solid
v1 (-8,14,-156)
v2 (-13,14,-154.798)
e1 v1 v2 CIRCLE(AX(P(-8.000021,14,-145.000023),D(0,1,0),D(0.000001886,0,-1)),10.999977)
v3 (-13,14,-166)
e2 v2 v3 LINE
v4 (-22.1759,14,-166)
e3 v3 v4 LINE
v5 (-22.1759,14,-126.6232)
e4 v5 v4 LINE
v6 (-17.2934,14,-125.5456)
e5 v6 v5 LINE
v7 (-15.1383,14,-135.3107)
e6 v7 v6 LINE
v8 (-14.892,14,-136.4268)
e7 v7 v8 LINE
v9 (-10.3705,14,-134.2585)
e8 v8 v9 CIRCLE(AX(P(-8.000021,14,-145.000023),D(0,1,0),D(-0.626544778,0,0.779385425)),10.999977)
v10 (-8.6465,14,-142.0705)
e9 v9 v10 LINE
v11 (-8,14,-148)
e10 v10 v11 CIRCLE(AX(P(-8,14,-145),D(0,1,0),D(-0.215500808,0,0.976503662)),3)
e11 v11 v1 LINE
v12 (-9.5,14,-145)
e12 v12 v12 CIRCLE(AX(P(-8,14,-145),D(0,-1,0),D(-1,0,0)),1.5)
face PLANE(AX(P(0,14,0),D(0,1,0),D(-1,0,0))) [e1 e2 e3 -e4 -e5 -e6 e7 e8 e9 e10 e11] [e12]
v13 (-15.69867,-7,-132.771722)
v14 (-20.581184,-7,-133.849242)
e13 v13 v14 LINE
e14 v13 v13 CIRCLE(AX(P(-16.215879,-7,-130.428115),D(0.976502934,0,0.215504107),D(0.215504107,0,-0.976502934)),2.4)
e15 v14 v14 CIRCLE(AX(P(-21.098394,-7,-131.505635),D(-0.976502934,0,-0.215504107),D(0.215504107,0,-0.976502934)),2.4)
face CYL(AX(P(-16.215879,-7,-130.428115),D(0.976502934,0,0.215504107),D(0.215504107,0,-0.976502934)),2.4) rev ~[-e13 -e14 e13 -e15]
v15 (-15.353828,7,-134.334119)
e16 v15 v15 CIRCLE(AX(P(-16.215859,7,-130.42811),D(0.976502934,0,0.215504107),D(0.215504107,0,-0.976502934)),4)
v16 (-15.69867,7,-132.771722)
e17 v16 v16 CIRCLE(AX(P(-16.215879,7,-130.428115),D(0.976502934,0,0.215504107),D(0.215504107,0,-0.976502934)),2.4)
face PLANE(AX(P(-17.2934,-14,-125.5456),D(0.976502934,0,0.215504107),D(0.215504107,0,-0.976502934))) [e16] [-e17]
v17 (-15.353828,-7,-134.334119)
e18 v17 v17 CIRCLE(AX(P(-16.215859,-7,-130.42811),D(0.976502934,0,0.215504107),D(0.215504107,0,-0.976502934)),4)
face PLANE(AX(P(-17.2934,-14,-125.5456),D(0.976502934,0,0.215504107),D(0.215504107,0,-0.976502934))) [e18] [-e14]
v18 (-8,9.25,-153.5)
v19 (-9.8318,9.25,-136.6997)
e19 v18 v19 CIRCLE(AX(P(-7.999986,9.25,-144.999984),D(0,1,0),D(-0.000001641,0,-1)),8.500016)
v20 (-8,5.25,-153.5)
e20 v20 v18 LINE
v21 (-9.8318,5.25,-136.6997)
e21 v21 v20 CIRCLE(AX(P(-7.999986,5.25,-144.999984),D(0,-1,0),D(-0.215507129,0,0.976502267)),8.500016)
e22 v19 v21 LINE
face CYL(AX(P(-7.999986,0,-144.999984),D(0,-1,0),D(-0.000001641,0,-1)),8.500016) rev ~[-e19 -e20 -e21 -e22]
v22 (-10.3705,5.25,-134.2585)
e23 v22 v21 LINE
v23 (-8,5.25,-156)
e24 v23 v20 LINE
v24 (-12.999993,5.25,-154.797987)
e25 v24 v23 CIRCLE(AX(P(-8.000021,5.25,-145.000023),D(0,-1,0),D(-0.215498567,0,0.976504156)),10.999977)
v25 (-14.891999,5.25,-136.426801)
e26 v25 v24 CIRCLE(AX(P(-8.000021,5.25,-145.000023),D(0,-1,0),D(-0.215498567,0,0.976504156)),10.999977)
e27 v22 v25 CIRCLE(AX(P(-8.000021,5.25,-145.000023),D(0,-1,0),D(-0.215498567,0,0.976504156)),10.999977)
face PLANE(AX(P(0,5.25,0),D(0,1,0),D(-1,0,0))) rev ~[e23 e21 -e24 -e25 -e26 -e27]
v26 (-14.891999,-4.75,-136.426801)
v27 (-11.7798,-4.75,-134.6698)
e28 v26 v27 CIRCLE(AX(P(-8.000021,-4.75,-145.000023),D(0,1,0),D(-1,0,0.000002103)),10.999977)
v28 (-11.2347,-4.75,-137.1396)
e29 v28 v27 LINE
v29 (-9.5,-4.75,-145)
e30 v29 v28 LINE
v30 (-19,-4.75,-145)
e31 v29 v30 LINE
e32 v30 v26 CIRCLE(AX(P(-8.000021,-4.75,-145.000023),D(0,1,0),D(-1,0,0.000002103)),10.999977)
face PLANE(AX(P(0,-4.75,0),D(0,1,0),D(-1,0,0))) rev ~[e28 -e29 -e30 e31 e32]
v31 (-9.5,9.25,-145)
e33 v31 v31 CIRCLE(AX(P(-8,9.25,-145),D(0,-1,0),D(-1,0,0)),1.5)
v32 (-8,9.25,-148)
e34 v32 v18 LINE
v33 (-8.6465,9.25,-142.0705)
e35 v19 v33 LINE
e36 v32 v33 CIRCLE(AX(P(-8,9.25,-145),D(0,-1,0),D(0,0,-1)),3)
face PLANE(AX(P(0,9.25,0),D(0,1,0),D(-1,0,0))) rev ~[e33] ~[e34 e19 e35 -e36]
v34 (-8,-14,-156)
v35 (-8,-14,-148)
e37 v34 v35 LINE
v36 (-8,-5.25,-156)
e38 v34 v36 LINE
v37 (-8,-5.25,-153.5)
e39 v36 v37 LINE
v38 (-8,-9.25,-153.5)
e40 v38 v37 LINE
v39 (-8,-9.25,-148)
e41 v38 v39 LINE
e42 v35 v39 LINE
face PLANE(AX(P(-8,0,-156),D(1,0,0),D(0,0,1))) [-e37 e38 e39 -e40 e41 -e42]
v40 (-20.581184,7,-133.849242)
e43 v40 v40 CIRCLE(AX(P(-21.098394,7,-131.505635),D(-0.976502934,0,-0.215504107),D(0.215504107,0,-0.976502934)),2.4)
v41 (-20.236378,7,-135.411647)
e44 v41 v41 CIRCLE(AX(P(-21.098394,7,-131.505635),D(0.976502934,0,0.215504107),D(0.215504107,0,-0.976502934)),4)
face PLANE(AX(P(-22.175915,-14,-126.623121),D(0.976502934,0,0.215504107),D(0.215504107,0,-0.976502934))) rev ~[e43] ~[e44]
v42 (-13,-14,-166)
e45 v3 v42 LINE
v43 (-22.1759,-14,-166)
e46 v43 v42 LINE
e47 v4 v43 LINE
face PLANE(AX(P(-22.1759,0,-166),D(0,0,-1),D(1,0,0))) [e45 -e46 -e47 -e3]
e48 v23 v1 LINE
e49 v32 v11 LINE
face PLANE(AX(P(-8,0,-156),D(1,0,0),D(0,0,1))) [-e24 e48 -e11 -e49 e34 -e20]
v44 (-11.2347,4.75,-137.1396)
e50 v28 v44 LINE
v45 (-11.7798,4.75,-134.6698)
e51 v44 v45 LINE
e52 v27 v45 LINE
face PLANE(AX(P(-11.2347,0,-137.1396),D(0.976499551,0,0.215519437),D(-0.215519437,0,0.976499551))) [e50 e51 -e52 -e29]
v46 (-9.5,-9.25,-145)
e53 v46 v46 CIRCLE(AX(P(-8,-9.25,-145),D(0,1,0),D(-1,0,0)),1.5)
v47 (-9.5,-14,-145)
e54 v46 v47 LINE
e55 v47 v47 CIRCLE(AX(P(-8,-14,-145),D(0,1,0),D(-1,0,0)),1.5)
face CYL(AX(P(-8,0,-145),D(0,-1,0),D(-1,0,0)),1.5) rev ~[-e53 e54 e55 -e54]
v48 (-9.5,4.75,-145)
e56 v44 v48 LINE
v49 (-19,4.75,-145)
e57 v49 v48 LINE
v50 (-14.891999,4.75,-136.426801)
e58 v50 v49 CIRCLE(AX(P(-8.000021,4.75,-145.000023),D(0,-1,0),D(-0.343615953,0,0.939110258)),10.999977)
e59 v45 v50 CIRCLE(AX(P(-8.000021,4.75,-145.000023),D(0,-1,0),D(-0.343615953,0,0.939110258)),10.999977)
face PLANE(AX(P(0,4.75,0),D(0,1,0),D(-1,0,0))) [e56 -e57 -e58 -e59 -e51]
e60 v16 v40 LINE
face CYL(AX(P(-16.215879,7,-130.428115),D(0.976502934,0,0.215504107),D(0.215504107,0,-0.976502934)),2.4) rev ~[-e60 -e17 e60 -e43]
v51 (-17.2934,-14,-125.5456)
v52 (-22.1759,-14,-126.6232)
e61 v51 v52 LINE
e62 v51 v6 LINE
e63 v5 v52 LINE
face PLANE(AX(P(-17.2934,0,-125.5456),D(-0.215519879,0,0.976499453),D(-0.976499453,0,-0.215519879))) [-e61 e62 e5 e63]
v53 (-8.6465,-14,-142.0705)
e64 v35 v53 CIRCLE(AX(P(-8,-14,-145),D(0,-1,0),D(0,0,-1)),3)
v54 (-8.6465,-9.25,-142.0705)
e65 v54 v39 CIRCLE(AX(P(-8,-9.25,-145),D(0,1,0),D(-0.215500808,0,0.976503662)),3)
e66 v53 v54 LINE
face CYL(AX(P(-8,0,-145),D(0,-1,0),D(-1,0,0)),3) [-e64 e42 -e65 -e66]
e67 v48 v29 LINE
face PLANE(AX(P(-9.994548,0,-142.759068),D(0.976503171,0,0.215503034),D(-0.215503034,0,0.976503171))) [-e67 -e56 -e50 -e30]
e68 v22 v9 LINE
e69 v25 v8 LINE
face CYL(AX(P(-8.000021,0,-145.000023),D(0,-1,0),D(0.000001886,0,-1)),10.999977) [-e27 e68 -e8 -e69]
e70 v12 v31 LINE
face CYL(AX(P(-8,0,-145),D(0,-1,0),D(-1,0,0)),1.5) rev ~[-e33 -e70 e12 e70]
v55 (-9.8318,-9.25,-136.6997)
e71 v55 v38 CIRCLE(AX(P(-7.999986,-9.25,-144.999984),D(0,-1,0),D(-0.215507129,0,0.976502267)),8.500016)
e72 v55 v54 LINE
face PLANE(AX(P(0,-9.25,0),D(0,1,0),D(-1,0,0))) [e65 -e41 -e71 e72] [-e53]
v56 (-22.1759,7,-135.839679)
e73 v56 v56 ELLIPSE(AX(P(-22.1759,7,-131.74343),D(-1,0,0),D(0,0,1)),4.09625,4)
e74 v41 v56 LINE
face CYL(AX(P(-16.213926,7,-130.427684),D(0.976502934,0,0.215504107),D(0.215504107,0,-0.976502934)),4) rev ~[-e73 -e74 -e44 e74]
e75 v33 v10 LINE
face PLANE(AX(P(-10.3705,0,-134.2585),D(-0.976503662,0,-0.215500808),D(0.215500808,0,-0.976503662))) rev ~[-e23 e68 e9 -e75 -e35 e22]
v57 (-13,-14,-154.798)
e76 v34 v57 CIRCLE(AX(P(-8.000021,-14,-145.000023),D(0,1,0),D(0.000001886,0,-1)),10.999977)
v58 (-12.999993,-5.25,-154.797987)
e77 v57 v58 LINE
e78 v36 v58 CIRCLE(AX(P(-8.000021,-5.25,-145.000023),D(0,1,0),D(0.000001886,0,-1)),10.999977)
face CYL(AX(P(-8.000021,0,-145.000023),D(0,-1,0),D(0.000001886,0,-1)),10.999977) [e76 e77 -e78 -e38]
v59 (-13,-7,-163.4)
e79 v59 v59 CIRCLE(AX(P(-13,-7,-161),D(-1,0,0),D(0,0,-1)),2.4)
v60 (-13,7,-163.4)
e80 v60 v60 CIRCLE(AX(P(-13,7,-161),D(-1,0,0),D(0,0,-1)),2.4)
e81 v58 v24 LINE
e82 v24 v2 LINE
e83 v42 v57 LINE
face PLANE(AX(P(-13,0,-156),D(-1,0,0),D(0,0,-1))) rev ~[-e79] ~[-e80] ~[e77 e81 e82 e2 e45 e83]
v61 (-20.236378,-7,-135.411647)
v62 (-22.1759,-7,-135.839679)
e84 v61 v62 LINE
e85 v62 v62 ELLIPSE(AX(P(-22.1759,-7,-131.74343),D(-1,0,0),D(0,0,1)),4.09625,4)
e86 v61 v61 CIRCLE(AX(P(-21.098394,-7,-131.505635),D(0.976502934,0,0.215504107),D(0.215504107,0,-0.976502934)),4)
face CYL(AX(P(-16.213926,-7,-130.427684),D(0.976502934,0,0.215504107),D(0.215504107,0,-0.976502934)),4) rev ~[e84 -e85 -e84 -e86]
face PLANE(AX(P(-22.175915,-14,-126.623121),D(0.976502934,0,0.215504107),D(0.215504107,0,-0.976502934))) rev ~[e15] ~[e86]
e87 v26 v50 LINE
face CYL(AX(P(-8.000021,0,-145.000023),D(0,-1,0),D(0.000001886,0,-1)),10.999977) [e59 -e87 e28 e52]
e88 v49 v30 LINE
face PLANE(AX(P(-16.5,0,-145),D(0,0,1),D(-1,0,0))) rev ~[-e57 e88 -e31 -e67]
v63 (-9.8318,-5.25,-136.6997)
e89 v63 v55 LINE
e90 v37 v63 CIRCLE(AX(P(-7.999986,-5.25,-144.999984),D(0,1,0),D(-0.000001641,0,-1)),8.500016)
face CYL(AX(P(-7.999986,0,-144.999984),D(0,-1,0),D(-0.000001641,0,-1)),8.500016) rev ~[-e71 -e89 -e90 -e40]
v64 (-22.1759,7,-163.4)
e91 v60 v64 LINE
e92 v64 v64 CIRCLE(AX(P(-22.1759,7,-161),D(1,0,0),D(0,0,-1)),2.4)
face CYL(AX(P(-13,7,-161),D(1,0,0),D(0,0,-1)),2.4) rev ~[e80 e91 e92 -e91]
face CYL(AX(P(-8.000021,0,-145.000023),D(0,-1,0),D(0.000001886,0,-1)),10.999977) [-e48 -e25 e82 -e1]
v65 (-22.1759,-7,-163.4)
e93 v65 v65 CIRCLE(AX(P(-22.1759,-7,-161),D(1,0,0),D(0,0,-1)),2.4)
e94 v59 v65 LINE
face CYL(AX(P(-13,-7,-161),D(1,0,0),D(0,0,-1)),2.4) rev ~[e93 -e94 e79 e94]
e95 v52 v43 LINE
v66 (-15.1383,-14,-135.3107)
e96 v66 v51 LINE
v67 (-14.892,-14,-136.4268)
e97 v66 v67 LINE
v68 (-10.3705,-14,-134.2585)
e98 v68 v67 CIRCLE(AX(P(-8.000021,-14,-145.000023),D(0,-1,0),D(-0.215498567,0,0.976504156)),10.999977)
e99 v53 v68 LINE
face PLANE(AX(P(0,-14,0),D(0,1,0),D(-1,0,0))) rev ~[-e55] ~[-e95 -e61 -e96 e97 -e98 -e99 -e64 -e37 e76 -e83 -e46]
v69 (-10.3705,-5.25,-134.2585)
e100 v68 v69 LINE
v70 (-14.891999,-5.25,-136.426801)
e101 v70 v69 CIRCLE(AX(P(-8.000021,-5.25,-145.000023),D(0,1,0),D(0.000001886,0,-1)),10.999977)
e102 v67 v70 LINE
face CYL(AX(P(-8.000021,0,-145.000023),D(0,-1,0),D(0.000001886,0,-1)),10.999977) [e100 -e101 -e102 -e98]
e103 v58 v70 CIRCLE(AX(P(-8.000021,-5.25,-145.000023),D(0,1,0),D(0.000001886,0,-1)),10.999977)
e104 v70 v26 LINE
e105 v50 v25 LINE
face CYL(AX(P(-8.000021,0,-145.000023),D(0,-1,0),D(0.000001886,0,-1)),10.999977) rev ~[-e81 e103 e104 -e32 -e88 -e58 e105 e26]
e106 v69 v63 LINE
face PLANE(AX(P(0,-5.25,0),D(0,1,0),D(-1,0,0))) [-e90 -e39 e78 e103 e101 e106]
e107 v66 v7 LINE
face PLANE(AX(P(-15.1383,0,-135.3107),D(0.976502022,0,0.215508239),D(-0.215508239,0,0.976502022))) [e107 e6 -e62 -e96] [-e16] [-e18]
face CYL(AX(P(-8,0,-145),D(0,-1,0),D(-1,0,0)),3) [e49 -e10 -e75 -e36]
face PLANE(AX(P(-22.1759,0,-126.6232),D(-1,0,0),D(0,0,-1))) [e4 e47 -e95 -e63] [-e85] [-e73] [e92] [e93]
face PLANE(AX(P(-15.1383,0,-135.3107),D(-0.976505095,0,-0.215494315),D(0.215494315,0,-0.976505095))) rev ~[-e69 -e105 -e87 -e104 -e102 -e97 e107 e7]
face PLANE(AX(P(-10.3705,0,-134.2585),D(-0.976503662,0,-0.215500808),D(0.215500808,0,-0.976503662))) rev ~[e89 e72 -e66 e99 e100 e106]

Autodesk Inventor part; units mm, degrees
ref_plane "YZ Plane" through (0, 0, 0) normal (1, 0, 0) x (0, 1, 0)
ref_plane "XZ Plane" through (0, 0, 0) normal (0, 1, 0) x (-1, 0, 0)
ref_plane "XY Plane" through (0, 0, 0) normal (0, 0, 1) x (1, 0, 0)
sketch "Sketch1" plane through (0, 0, 0) normal (0, 1, 0) x (-1, 0, 0)
  line L0 (0, 0) -> (0, -145)
  line L1 (0, -145) -> (3, -145)
  line L2 (3, -145) -> (8, -145)
  circle A0 centre (8, -145) radius 1.5
  line L3 (0, 0) -> (40, 0)
  line L4 (0, -145) -> (0, -250)
  line L5 (0, -250) -> (8, -250)
  line L6 (8, -156) -> (8, -148)
  circle A1 centre (8, -145) radius 3
  line L7 (13, -250) -> (8, -250)
  line L8 (8, -156) -> (13, -156)
  line L9 (13, -156) -> (13, -166)
  line L10 (10.3705, -134.2585) -> (15.1383, -135.3107)
  line L11 (15.1383, -135.3107) -> (14.892, -136.4268)
  line L12 (15.1383, -135.3107) -> (17.2934, -125.5456)
  line L13 (17.2934, -125.5456) -> (12.5256, -124.4934)
  line L14 (17.2934, -125.5456) -> (22.1759, -126.6232)
  line L15 (13, -166) -> (18, -166)
  line L16 (22.1759, -126.6232) -> (22.1759, -166)
  line L17 (22.1759, -166) -> (18, -166)
  arc A2 (0, -137.4502) -> (0, -152.5498) centre (8, -145) ccw
  arc A3 (8, -156) -> (10.3705, -134.2585) centre (8, -145) ccw
  line L18 (40, 0) -> (12.5256, -124.4934)
  line L19 (10.3705, -134.2585) -> (8.6465, -142.0705)
  line L20 (8, -148) -> (8, -153)
  arc A4 (0, -142.1277) -> (0, -147.8723) centre (8, -145) ccw
  arc A5 (8, -153.5) -> (9.8318, -136.6997) centre (8, -145) ccw
  line L21 (8, -153.5) -> (8, -156)
  line L22 (9.8318, -136.6997) -> (10.3705, -134.2585)
  line L23 (9.5, -145) -> (11.2347, -137.1396)
  line L24 (9.5, -145) -> (16.5, -145)
  line L25 (13, -156) -> (13, -154.798)
  line L26 (16.5, -145) -> (19, -145)
  line L27 (11.2347, -137.1396) -> (11.7798, -134.6698)
  dimension "d4" = 3
  dimension "d0" = 145
  dimension "d1" = 3
  dimension "d2" = 5
  dimension "d5" = 40
  dimension "d6" = 105
  dimension "d8" = 6
  dimension "d10" = 10
  dimension "d11" = 10
  dimension "d12" = 5
  dimension "d13" = 5
extrude "Extrusion4" add sketch "Sketch1" along normal mid plane 28 contours L14 L16 L17 L15 L9 L25 A3 L11 L12 | A1 L23 A0 L2 | L2 A0 L24 A1 | A3 L27 A5 L19 | A3 L26 A5 L27 | L19 A5 L23 A1 | A1 L24 A5 L6 | A3 L6 A5 L26 | L23 A1 L24 | L23 A5 L24 A1
extrude "Extrusion5" cut sketch "Sketch1" along normal mid plane 18.5 contours A1 L23 A0 L2 | L2 A0 L24 A1 | L19 A5 L23 A1 | A1 L24 A5 L6 | L23 A1 L24 | L23 A5 L24 A1
extrude "Extrusion6" cut sketch "Sketch1" along normal mid plane 10.5 contours A3 L27 A5 L19 | A3 L26 A5 L27 | A3 L6 A5 L26
extrude "Extrusion7" add sketch "Sketch1" along normal mid plane 9.5 contours A3 L26 A5 L27 | L23 A1 L24 | L23 A5 L24 A1
sketch "Sketch2" plane through (-17.2934, -14, -125.5456) normal (0.9765029, 0, 0.2155041) x (0.2155041, 0, -0.9765029)
  line L0 (0, 28) -> (0, 14)
  line L1 (0, 0) -> (0, 28) projected
  line L2 (0, 14) -> (5, 14)
  line L3 (5, 14) -> (5, 21)
  line L4 (5, 14) -> (5, 7)
  circle A0 centre (5, 21) radius 2.4
  circle A1 centre (5, 7) radius 2.4
  circle A2 centre (5, 21) radius 4
  circle A3 centre (5, 7) radius 4
  point P0 (-118.8689, 14)
  dimension "d29" = 5
  dimension "d30" = 7
  dimension "d31" = 7
  dimension "d32" = 4.8
  dimension "d33" = 4.8
  dimension "d34" = 8
  dimension "d35" = 8
extrude "Extrusion8" cut sketch "Sketch2" against normal blind 10.5 contours A0 | A1 | A2 | A3
extrude "Extrusion9" add sketch "Sketch2" against normal blind 5
sketch "Sketch3" plane through (-13, -14, -166) normal (1, 0, 0) x (0, 0, -1)
  line L0 (0, 28) -> (0, 14)
  line L1 (0, 0) -> (0, 28) projected
  line L2 (0, 14) -> (-5, 14)
  line L3 (-5, 14) -> (-5, 21)
  line L4 (-5, 14) -> (-5, 7)
  circle A0 centre (-5, 21) radius 2.4
  circle A1 centre (-5, 7) radius 2.4
  point P0 (-166, 14)
  dimension "d40" = 5
  dimension "d41" = 7
  dimension "d42" = 7
  dimension "d43" = 4.8
  dimension "d44" = 4.8
extrude "Extrusion10" cut sketch "Sketch3" against normal blind 10
properties part number "clip_hinge(2)"
